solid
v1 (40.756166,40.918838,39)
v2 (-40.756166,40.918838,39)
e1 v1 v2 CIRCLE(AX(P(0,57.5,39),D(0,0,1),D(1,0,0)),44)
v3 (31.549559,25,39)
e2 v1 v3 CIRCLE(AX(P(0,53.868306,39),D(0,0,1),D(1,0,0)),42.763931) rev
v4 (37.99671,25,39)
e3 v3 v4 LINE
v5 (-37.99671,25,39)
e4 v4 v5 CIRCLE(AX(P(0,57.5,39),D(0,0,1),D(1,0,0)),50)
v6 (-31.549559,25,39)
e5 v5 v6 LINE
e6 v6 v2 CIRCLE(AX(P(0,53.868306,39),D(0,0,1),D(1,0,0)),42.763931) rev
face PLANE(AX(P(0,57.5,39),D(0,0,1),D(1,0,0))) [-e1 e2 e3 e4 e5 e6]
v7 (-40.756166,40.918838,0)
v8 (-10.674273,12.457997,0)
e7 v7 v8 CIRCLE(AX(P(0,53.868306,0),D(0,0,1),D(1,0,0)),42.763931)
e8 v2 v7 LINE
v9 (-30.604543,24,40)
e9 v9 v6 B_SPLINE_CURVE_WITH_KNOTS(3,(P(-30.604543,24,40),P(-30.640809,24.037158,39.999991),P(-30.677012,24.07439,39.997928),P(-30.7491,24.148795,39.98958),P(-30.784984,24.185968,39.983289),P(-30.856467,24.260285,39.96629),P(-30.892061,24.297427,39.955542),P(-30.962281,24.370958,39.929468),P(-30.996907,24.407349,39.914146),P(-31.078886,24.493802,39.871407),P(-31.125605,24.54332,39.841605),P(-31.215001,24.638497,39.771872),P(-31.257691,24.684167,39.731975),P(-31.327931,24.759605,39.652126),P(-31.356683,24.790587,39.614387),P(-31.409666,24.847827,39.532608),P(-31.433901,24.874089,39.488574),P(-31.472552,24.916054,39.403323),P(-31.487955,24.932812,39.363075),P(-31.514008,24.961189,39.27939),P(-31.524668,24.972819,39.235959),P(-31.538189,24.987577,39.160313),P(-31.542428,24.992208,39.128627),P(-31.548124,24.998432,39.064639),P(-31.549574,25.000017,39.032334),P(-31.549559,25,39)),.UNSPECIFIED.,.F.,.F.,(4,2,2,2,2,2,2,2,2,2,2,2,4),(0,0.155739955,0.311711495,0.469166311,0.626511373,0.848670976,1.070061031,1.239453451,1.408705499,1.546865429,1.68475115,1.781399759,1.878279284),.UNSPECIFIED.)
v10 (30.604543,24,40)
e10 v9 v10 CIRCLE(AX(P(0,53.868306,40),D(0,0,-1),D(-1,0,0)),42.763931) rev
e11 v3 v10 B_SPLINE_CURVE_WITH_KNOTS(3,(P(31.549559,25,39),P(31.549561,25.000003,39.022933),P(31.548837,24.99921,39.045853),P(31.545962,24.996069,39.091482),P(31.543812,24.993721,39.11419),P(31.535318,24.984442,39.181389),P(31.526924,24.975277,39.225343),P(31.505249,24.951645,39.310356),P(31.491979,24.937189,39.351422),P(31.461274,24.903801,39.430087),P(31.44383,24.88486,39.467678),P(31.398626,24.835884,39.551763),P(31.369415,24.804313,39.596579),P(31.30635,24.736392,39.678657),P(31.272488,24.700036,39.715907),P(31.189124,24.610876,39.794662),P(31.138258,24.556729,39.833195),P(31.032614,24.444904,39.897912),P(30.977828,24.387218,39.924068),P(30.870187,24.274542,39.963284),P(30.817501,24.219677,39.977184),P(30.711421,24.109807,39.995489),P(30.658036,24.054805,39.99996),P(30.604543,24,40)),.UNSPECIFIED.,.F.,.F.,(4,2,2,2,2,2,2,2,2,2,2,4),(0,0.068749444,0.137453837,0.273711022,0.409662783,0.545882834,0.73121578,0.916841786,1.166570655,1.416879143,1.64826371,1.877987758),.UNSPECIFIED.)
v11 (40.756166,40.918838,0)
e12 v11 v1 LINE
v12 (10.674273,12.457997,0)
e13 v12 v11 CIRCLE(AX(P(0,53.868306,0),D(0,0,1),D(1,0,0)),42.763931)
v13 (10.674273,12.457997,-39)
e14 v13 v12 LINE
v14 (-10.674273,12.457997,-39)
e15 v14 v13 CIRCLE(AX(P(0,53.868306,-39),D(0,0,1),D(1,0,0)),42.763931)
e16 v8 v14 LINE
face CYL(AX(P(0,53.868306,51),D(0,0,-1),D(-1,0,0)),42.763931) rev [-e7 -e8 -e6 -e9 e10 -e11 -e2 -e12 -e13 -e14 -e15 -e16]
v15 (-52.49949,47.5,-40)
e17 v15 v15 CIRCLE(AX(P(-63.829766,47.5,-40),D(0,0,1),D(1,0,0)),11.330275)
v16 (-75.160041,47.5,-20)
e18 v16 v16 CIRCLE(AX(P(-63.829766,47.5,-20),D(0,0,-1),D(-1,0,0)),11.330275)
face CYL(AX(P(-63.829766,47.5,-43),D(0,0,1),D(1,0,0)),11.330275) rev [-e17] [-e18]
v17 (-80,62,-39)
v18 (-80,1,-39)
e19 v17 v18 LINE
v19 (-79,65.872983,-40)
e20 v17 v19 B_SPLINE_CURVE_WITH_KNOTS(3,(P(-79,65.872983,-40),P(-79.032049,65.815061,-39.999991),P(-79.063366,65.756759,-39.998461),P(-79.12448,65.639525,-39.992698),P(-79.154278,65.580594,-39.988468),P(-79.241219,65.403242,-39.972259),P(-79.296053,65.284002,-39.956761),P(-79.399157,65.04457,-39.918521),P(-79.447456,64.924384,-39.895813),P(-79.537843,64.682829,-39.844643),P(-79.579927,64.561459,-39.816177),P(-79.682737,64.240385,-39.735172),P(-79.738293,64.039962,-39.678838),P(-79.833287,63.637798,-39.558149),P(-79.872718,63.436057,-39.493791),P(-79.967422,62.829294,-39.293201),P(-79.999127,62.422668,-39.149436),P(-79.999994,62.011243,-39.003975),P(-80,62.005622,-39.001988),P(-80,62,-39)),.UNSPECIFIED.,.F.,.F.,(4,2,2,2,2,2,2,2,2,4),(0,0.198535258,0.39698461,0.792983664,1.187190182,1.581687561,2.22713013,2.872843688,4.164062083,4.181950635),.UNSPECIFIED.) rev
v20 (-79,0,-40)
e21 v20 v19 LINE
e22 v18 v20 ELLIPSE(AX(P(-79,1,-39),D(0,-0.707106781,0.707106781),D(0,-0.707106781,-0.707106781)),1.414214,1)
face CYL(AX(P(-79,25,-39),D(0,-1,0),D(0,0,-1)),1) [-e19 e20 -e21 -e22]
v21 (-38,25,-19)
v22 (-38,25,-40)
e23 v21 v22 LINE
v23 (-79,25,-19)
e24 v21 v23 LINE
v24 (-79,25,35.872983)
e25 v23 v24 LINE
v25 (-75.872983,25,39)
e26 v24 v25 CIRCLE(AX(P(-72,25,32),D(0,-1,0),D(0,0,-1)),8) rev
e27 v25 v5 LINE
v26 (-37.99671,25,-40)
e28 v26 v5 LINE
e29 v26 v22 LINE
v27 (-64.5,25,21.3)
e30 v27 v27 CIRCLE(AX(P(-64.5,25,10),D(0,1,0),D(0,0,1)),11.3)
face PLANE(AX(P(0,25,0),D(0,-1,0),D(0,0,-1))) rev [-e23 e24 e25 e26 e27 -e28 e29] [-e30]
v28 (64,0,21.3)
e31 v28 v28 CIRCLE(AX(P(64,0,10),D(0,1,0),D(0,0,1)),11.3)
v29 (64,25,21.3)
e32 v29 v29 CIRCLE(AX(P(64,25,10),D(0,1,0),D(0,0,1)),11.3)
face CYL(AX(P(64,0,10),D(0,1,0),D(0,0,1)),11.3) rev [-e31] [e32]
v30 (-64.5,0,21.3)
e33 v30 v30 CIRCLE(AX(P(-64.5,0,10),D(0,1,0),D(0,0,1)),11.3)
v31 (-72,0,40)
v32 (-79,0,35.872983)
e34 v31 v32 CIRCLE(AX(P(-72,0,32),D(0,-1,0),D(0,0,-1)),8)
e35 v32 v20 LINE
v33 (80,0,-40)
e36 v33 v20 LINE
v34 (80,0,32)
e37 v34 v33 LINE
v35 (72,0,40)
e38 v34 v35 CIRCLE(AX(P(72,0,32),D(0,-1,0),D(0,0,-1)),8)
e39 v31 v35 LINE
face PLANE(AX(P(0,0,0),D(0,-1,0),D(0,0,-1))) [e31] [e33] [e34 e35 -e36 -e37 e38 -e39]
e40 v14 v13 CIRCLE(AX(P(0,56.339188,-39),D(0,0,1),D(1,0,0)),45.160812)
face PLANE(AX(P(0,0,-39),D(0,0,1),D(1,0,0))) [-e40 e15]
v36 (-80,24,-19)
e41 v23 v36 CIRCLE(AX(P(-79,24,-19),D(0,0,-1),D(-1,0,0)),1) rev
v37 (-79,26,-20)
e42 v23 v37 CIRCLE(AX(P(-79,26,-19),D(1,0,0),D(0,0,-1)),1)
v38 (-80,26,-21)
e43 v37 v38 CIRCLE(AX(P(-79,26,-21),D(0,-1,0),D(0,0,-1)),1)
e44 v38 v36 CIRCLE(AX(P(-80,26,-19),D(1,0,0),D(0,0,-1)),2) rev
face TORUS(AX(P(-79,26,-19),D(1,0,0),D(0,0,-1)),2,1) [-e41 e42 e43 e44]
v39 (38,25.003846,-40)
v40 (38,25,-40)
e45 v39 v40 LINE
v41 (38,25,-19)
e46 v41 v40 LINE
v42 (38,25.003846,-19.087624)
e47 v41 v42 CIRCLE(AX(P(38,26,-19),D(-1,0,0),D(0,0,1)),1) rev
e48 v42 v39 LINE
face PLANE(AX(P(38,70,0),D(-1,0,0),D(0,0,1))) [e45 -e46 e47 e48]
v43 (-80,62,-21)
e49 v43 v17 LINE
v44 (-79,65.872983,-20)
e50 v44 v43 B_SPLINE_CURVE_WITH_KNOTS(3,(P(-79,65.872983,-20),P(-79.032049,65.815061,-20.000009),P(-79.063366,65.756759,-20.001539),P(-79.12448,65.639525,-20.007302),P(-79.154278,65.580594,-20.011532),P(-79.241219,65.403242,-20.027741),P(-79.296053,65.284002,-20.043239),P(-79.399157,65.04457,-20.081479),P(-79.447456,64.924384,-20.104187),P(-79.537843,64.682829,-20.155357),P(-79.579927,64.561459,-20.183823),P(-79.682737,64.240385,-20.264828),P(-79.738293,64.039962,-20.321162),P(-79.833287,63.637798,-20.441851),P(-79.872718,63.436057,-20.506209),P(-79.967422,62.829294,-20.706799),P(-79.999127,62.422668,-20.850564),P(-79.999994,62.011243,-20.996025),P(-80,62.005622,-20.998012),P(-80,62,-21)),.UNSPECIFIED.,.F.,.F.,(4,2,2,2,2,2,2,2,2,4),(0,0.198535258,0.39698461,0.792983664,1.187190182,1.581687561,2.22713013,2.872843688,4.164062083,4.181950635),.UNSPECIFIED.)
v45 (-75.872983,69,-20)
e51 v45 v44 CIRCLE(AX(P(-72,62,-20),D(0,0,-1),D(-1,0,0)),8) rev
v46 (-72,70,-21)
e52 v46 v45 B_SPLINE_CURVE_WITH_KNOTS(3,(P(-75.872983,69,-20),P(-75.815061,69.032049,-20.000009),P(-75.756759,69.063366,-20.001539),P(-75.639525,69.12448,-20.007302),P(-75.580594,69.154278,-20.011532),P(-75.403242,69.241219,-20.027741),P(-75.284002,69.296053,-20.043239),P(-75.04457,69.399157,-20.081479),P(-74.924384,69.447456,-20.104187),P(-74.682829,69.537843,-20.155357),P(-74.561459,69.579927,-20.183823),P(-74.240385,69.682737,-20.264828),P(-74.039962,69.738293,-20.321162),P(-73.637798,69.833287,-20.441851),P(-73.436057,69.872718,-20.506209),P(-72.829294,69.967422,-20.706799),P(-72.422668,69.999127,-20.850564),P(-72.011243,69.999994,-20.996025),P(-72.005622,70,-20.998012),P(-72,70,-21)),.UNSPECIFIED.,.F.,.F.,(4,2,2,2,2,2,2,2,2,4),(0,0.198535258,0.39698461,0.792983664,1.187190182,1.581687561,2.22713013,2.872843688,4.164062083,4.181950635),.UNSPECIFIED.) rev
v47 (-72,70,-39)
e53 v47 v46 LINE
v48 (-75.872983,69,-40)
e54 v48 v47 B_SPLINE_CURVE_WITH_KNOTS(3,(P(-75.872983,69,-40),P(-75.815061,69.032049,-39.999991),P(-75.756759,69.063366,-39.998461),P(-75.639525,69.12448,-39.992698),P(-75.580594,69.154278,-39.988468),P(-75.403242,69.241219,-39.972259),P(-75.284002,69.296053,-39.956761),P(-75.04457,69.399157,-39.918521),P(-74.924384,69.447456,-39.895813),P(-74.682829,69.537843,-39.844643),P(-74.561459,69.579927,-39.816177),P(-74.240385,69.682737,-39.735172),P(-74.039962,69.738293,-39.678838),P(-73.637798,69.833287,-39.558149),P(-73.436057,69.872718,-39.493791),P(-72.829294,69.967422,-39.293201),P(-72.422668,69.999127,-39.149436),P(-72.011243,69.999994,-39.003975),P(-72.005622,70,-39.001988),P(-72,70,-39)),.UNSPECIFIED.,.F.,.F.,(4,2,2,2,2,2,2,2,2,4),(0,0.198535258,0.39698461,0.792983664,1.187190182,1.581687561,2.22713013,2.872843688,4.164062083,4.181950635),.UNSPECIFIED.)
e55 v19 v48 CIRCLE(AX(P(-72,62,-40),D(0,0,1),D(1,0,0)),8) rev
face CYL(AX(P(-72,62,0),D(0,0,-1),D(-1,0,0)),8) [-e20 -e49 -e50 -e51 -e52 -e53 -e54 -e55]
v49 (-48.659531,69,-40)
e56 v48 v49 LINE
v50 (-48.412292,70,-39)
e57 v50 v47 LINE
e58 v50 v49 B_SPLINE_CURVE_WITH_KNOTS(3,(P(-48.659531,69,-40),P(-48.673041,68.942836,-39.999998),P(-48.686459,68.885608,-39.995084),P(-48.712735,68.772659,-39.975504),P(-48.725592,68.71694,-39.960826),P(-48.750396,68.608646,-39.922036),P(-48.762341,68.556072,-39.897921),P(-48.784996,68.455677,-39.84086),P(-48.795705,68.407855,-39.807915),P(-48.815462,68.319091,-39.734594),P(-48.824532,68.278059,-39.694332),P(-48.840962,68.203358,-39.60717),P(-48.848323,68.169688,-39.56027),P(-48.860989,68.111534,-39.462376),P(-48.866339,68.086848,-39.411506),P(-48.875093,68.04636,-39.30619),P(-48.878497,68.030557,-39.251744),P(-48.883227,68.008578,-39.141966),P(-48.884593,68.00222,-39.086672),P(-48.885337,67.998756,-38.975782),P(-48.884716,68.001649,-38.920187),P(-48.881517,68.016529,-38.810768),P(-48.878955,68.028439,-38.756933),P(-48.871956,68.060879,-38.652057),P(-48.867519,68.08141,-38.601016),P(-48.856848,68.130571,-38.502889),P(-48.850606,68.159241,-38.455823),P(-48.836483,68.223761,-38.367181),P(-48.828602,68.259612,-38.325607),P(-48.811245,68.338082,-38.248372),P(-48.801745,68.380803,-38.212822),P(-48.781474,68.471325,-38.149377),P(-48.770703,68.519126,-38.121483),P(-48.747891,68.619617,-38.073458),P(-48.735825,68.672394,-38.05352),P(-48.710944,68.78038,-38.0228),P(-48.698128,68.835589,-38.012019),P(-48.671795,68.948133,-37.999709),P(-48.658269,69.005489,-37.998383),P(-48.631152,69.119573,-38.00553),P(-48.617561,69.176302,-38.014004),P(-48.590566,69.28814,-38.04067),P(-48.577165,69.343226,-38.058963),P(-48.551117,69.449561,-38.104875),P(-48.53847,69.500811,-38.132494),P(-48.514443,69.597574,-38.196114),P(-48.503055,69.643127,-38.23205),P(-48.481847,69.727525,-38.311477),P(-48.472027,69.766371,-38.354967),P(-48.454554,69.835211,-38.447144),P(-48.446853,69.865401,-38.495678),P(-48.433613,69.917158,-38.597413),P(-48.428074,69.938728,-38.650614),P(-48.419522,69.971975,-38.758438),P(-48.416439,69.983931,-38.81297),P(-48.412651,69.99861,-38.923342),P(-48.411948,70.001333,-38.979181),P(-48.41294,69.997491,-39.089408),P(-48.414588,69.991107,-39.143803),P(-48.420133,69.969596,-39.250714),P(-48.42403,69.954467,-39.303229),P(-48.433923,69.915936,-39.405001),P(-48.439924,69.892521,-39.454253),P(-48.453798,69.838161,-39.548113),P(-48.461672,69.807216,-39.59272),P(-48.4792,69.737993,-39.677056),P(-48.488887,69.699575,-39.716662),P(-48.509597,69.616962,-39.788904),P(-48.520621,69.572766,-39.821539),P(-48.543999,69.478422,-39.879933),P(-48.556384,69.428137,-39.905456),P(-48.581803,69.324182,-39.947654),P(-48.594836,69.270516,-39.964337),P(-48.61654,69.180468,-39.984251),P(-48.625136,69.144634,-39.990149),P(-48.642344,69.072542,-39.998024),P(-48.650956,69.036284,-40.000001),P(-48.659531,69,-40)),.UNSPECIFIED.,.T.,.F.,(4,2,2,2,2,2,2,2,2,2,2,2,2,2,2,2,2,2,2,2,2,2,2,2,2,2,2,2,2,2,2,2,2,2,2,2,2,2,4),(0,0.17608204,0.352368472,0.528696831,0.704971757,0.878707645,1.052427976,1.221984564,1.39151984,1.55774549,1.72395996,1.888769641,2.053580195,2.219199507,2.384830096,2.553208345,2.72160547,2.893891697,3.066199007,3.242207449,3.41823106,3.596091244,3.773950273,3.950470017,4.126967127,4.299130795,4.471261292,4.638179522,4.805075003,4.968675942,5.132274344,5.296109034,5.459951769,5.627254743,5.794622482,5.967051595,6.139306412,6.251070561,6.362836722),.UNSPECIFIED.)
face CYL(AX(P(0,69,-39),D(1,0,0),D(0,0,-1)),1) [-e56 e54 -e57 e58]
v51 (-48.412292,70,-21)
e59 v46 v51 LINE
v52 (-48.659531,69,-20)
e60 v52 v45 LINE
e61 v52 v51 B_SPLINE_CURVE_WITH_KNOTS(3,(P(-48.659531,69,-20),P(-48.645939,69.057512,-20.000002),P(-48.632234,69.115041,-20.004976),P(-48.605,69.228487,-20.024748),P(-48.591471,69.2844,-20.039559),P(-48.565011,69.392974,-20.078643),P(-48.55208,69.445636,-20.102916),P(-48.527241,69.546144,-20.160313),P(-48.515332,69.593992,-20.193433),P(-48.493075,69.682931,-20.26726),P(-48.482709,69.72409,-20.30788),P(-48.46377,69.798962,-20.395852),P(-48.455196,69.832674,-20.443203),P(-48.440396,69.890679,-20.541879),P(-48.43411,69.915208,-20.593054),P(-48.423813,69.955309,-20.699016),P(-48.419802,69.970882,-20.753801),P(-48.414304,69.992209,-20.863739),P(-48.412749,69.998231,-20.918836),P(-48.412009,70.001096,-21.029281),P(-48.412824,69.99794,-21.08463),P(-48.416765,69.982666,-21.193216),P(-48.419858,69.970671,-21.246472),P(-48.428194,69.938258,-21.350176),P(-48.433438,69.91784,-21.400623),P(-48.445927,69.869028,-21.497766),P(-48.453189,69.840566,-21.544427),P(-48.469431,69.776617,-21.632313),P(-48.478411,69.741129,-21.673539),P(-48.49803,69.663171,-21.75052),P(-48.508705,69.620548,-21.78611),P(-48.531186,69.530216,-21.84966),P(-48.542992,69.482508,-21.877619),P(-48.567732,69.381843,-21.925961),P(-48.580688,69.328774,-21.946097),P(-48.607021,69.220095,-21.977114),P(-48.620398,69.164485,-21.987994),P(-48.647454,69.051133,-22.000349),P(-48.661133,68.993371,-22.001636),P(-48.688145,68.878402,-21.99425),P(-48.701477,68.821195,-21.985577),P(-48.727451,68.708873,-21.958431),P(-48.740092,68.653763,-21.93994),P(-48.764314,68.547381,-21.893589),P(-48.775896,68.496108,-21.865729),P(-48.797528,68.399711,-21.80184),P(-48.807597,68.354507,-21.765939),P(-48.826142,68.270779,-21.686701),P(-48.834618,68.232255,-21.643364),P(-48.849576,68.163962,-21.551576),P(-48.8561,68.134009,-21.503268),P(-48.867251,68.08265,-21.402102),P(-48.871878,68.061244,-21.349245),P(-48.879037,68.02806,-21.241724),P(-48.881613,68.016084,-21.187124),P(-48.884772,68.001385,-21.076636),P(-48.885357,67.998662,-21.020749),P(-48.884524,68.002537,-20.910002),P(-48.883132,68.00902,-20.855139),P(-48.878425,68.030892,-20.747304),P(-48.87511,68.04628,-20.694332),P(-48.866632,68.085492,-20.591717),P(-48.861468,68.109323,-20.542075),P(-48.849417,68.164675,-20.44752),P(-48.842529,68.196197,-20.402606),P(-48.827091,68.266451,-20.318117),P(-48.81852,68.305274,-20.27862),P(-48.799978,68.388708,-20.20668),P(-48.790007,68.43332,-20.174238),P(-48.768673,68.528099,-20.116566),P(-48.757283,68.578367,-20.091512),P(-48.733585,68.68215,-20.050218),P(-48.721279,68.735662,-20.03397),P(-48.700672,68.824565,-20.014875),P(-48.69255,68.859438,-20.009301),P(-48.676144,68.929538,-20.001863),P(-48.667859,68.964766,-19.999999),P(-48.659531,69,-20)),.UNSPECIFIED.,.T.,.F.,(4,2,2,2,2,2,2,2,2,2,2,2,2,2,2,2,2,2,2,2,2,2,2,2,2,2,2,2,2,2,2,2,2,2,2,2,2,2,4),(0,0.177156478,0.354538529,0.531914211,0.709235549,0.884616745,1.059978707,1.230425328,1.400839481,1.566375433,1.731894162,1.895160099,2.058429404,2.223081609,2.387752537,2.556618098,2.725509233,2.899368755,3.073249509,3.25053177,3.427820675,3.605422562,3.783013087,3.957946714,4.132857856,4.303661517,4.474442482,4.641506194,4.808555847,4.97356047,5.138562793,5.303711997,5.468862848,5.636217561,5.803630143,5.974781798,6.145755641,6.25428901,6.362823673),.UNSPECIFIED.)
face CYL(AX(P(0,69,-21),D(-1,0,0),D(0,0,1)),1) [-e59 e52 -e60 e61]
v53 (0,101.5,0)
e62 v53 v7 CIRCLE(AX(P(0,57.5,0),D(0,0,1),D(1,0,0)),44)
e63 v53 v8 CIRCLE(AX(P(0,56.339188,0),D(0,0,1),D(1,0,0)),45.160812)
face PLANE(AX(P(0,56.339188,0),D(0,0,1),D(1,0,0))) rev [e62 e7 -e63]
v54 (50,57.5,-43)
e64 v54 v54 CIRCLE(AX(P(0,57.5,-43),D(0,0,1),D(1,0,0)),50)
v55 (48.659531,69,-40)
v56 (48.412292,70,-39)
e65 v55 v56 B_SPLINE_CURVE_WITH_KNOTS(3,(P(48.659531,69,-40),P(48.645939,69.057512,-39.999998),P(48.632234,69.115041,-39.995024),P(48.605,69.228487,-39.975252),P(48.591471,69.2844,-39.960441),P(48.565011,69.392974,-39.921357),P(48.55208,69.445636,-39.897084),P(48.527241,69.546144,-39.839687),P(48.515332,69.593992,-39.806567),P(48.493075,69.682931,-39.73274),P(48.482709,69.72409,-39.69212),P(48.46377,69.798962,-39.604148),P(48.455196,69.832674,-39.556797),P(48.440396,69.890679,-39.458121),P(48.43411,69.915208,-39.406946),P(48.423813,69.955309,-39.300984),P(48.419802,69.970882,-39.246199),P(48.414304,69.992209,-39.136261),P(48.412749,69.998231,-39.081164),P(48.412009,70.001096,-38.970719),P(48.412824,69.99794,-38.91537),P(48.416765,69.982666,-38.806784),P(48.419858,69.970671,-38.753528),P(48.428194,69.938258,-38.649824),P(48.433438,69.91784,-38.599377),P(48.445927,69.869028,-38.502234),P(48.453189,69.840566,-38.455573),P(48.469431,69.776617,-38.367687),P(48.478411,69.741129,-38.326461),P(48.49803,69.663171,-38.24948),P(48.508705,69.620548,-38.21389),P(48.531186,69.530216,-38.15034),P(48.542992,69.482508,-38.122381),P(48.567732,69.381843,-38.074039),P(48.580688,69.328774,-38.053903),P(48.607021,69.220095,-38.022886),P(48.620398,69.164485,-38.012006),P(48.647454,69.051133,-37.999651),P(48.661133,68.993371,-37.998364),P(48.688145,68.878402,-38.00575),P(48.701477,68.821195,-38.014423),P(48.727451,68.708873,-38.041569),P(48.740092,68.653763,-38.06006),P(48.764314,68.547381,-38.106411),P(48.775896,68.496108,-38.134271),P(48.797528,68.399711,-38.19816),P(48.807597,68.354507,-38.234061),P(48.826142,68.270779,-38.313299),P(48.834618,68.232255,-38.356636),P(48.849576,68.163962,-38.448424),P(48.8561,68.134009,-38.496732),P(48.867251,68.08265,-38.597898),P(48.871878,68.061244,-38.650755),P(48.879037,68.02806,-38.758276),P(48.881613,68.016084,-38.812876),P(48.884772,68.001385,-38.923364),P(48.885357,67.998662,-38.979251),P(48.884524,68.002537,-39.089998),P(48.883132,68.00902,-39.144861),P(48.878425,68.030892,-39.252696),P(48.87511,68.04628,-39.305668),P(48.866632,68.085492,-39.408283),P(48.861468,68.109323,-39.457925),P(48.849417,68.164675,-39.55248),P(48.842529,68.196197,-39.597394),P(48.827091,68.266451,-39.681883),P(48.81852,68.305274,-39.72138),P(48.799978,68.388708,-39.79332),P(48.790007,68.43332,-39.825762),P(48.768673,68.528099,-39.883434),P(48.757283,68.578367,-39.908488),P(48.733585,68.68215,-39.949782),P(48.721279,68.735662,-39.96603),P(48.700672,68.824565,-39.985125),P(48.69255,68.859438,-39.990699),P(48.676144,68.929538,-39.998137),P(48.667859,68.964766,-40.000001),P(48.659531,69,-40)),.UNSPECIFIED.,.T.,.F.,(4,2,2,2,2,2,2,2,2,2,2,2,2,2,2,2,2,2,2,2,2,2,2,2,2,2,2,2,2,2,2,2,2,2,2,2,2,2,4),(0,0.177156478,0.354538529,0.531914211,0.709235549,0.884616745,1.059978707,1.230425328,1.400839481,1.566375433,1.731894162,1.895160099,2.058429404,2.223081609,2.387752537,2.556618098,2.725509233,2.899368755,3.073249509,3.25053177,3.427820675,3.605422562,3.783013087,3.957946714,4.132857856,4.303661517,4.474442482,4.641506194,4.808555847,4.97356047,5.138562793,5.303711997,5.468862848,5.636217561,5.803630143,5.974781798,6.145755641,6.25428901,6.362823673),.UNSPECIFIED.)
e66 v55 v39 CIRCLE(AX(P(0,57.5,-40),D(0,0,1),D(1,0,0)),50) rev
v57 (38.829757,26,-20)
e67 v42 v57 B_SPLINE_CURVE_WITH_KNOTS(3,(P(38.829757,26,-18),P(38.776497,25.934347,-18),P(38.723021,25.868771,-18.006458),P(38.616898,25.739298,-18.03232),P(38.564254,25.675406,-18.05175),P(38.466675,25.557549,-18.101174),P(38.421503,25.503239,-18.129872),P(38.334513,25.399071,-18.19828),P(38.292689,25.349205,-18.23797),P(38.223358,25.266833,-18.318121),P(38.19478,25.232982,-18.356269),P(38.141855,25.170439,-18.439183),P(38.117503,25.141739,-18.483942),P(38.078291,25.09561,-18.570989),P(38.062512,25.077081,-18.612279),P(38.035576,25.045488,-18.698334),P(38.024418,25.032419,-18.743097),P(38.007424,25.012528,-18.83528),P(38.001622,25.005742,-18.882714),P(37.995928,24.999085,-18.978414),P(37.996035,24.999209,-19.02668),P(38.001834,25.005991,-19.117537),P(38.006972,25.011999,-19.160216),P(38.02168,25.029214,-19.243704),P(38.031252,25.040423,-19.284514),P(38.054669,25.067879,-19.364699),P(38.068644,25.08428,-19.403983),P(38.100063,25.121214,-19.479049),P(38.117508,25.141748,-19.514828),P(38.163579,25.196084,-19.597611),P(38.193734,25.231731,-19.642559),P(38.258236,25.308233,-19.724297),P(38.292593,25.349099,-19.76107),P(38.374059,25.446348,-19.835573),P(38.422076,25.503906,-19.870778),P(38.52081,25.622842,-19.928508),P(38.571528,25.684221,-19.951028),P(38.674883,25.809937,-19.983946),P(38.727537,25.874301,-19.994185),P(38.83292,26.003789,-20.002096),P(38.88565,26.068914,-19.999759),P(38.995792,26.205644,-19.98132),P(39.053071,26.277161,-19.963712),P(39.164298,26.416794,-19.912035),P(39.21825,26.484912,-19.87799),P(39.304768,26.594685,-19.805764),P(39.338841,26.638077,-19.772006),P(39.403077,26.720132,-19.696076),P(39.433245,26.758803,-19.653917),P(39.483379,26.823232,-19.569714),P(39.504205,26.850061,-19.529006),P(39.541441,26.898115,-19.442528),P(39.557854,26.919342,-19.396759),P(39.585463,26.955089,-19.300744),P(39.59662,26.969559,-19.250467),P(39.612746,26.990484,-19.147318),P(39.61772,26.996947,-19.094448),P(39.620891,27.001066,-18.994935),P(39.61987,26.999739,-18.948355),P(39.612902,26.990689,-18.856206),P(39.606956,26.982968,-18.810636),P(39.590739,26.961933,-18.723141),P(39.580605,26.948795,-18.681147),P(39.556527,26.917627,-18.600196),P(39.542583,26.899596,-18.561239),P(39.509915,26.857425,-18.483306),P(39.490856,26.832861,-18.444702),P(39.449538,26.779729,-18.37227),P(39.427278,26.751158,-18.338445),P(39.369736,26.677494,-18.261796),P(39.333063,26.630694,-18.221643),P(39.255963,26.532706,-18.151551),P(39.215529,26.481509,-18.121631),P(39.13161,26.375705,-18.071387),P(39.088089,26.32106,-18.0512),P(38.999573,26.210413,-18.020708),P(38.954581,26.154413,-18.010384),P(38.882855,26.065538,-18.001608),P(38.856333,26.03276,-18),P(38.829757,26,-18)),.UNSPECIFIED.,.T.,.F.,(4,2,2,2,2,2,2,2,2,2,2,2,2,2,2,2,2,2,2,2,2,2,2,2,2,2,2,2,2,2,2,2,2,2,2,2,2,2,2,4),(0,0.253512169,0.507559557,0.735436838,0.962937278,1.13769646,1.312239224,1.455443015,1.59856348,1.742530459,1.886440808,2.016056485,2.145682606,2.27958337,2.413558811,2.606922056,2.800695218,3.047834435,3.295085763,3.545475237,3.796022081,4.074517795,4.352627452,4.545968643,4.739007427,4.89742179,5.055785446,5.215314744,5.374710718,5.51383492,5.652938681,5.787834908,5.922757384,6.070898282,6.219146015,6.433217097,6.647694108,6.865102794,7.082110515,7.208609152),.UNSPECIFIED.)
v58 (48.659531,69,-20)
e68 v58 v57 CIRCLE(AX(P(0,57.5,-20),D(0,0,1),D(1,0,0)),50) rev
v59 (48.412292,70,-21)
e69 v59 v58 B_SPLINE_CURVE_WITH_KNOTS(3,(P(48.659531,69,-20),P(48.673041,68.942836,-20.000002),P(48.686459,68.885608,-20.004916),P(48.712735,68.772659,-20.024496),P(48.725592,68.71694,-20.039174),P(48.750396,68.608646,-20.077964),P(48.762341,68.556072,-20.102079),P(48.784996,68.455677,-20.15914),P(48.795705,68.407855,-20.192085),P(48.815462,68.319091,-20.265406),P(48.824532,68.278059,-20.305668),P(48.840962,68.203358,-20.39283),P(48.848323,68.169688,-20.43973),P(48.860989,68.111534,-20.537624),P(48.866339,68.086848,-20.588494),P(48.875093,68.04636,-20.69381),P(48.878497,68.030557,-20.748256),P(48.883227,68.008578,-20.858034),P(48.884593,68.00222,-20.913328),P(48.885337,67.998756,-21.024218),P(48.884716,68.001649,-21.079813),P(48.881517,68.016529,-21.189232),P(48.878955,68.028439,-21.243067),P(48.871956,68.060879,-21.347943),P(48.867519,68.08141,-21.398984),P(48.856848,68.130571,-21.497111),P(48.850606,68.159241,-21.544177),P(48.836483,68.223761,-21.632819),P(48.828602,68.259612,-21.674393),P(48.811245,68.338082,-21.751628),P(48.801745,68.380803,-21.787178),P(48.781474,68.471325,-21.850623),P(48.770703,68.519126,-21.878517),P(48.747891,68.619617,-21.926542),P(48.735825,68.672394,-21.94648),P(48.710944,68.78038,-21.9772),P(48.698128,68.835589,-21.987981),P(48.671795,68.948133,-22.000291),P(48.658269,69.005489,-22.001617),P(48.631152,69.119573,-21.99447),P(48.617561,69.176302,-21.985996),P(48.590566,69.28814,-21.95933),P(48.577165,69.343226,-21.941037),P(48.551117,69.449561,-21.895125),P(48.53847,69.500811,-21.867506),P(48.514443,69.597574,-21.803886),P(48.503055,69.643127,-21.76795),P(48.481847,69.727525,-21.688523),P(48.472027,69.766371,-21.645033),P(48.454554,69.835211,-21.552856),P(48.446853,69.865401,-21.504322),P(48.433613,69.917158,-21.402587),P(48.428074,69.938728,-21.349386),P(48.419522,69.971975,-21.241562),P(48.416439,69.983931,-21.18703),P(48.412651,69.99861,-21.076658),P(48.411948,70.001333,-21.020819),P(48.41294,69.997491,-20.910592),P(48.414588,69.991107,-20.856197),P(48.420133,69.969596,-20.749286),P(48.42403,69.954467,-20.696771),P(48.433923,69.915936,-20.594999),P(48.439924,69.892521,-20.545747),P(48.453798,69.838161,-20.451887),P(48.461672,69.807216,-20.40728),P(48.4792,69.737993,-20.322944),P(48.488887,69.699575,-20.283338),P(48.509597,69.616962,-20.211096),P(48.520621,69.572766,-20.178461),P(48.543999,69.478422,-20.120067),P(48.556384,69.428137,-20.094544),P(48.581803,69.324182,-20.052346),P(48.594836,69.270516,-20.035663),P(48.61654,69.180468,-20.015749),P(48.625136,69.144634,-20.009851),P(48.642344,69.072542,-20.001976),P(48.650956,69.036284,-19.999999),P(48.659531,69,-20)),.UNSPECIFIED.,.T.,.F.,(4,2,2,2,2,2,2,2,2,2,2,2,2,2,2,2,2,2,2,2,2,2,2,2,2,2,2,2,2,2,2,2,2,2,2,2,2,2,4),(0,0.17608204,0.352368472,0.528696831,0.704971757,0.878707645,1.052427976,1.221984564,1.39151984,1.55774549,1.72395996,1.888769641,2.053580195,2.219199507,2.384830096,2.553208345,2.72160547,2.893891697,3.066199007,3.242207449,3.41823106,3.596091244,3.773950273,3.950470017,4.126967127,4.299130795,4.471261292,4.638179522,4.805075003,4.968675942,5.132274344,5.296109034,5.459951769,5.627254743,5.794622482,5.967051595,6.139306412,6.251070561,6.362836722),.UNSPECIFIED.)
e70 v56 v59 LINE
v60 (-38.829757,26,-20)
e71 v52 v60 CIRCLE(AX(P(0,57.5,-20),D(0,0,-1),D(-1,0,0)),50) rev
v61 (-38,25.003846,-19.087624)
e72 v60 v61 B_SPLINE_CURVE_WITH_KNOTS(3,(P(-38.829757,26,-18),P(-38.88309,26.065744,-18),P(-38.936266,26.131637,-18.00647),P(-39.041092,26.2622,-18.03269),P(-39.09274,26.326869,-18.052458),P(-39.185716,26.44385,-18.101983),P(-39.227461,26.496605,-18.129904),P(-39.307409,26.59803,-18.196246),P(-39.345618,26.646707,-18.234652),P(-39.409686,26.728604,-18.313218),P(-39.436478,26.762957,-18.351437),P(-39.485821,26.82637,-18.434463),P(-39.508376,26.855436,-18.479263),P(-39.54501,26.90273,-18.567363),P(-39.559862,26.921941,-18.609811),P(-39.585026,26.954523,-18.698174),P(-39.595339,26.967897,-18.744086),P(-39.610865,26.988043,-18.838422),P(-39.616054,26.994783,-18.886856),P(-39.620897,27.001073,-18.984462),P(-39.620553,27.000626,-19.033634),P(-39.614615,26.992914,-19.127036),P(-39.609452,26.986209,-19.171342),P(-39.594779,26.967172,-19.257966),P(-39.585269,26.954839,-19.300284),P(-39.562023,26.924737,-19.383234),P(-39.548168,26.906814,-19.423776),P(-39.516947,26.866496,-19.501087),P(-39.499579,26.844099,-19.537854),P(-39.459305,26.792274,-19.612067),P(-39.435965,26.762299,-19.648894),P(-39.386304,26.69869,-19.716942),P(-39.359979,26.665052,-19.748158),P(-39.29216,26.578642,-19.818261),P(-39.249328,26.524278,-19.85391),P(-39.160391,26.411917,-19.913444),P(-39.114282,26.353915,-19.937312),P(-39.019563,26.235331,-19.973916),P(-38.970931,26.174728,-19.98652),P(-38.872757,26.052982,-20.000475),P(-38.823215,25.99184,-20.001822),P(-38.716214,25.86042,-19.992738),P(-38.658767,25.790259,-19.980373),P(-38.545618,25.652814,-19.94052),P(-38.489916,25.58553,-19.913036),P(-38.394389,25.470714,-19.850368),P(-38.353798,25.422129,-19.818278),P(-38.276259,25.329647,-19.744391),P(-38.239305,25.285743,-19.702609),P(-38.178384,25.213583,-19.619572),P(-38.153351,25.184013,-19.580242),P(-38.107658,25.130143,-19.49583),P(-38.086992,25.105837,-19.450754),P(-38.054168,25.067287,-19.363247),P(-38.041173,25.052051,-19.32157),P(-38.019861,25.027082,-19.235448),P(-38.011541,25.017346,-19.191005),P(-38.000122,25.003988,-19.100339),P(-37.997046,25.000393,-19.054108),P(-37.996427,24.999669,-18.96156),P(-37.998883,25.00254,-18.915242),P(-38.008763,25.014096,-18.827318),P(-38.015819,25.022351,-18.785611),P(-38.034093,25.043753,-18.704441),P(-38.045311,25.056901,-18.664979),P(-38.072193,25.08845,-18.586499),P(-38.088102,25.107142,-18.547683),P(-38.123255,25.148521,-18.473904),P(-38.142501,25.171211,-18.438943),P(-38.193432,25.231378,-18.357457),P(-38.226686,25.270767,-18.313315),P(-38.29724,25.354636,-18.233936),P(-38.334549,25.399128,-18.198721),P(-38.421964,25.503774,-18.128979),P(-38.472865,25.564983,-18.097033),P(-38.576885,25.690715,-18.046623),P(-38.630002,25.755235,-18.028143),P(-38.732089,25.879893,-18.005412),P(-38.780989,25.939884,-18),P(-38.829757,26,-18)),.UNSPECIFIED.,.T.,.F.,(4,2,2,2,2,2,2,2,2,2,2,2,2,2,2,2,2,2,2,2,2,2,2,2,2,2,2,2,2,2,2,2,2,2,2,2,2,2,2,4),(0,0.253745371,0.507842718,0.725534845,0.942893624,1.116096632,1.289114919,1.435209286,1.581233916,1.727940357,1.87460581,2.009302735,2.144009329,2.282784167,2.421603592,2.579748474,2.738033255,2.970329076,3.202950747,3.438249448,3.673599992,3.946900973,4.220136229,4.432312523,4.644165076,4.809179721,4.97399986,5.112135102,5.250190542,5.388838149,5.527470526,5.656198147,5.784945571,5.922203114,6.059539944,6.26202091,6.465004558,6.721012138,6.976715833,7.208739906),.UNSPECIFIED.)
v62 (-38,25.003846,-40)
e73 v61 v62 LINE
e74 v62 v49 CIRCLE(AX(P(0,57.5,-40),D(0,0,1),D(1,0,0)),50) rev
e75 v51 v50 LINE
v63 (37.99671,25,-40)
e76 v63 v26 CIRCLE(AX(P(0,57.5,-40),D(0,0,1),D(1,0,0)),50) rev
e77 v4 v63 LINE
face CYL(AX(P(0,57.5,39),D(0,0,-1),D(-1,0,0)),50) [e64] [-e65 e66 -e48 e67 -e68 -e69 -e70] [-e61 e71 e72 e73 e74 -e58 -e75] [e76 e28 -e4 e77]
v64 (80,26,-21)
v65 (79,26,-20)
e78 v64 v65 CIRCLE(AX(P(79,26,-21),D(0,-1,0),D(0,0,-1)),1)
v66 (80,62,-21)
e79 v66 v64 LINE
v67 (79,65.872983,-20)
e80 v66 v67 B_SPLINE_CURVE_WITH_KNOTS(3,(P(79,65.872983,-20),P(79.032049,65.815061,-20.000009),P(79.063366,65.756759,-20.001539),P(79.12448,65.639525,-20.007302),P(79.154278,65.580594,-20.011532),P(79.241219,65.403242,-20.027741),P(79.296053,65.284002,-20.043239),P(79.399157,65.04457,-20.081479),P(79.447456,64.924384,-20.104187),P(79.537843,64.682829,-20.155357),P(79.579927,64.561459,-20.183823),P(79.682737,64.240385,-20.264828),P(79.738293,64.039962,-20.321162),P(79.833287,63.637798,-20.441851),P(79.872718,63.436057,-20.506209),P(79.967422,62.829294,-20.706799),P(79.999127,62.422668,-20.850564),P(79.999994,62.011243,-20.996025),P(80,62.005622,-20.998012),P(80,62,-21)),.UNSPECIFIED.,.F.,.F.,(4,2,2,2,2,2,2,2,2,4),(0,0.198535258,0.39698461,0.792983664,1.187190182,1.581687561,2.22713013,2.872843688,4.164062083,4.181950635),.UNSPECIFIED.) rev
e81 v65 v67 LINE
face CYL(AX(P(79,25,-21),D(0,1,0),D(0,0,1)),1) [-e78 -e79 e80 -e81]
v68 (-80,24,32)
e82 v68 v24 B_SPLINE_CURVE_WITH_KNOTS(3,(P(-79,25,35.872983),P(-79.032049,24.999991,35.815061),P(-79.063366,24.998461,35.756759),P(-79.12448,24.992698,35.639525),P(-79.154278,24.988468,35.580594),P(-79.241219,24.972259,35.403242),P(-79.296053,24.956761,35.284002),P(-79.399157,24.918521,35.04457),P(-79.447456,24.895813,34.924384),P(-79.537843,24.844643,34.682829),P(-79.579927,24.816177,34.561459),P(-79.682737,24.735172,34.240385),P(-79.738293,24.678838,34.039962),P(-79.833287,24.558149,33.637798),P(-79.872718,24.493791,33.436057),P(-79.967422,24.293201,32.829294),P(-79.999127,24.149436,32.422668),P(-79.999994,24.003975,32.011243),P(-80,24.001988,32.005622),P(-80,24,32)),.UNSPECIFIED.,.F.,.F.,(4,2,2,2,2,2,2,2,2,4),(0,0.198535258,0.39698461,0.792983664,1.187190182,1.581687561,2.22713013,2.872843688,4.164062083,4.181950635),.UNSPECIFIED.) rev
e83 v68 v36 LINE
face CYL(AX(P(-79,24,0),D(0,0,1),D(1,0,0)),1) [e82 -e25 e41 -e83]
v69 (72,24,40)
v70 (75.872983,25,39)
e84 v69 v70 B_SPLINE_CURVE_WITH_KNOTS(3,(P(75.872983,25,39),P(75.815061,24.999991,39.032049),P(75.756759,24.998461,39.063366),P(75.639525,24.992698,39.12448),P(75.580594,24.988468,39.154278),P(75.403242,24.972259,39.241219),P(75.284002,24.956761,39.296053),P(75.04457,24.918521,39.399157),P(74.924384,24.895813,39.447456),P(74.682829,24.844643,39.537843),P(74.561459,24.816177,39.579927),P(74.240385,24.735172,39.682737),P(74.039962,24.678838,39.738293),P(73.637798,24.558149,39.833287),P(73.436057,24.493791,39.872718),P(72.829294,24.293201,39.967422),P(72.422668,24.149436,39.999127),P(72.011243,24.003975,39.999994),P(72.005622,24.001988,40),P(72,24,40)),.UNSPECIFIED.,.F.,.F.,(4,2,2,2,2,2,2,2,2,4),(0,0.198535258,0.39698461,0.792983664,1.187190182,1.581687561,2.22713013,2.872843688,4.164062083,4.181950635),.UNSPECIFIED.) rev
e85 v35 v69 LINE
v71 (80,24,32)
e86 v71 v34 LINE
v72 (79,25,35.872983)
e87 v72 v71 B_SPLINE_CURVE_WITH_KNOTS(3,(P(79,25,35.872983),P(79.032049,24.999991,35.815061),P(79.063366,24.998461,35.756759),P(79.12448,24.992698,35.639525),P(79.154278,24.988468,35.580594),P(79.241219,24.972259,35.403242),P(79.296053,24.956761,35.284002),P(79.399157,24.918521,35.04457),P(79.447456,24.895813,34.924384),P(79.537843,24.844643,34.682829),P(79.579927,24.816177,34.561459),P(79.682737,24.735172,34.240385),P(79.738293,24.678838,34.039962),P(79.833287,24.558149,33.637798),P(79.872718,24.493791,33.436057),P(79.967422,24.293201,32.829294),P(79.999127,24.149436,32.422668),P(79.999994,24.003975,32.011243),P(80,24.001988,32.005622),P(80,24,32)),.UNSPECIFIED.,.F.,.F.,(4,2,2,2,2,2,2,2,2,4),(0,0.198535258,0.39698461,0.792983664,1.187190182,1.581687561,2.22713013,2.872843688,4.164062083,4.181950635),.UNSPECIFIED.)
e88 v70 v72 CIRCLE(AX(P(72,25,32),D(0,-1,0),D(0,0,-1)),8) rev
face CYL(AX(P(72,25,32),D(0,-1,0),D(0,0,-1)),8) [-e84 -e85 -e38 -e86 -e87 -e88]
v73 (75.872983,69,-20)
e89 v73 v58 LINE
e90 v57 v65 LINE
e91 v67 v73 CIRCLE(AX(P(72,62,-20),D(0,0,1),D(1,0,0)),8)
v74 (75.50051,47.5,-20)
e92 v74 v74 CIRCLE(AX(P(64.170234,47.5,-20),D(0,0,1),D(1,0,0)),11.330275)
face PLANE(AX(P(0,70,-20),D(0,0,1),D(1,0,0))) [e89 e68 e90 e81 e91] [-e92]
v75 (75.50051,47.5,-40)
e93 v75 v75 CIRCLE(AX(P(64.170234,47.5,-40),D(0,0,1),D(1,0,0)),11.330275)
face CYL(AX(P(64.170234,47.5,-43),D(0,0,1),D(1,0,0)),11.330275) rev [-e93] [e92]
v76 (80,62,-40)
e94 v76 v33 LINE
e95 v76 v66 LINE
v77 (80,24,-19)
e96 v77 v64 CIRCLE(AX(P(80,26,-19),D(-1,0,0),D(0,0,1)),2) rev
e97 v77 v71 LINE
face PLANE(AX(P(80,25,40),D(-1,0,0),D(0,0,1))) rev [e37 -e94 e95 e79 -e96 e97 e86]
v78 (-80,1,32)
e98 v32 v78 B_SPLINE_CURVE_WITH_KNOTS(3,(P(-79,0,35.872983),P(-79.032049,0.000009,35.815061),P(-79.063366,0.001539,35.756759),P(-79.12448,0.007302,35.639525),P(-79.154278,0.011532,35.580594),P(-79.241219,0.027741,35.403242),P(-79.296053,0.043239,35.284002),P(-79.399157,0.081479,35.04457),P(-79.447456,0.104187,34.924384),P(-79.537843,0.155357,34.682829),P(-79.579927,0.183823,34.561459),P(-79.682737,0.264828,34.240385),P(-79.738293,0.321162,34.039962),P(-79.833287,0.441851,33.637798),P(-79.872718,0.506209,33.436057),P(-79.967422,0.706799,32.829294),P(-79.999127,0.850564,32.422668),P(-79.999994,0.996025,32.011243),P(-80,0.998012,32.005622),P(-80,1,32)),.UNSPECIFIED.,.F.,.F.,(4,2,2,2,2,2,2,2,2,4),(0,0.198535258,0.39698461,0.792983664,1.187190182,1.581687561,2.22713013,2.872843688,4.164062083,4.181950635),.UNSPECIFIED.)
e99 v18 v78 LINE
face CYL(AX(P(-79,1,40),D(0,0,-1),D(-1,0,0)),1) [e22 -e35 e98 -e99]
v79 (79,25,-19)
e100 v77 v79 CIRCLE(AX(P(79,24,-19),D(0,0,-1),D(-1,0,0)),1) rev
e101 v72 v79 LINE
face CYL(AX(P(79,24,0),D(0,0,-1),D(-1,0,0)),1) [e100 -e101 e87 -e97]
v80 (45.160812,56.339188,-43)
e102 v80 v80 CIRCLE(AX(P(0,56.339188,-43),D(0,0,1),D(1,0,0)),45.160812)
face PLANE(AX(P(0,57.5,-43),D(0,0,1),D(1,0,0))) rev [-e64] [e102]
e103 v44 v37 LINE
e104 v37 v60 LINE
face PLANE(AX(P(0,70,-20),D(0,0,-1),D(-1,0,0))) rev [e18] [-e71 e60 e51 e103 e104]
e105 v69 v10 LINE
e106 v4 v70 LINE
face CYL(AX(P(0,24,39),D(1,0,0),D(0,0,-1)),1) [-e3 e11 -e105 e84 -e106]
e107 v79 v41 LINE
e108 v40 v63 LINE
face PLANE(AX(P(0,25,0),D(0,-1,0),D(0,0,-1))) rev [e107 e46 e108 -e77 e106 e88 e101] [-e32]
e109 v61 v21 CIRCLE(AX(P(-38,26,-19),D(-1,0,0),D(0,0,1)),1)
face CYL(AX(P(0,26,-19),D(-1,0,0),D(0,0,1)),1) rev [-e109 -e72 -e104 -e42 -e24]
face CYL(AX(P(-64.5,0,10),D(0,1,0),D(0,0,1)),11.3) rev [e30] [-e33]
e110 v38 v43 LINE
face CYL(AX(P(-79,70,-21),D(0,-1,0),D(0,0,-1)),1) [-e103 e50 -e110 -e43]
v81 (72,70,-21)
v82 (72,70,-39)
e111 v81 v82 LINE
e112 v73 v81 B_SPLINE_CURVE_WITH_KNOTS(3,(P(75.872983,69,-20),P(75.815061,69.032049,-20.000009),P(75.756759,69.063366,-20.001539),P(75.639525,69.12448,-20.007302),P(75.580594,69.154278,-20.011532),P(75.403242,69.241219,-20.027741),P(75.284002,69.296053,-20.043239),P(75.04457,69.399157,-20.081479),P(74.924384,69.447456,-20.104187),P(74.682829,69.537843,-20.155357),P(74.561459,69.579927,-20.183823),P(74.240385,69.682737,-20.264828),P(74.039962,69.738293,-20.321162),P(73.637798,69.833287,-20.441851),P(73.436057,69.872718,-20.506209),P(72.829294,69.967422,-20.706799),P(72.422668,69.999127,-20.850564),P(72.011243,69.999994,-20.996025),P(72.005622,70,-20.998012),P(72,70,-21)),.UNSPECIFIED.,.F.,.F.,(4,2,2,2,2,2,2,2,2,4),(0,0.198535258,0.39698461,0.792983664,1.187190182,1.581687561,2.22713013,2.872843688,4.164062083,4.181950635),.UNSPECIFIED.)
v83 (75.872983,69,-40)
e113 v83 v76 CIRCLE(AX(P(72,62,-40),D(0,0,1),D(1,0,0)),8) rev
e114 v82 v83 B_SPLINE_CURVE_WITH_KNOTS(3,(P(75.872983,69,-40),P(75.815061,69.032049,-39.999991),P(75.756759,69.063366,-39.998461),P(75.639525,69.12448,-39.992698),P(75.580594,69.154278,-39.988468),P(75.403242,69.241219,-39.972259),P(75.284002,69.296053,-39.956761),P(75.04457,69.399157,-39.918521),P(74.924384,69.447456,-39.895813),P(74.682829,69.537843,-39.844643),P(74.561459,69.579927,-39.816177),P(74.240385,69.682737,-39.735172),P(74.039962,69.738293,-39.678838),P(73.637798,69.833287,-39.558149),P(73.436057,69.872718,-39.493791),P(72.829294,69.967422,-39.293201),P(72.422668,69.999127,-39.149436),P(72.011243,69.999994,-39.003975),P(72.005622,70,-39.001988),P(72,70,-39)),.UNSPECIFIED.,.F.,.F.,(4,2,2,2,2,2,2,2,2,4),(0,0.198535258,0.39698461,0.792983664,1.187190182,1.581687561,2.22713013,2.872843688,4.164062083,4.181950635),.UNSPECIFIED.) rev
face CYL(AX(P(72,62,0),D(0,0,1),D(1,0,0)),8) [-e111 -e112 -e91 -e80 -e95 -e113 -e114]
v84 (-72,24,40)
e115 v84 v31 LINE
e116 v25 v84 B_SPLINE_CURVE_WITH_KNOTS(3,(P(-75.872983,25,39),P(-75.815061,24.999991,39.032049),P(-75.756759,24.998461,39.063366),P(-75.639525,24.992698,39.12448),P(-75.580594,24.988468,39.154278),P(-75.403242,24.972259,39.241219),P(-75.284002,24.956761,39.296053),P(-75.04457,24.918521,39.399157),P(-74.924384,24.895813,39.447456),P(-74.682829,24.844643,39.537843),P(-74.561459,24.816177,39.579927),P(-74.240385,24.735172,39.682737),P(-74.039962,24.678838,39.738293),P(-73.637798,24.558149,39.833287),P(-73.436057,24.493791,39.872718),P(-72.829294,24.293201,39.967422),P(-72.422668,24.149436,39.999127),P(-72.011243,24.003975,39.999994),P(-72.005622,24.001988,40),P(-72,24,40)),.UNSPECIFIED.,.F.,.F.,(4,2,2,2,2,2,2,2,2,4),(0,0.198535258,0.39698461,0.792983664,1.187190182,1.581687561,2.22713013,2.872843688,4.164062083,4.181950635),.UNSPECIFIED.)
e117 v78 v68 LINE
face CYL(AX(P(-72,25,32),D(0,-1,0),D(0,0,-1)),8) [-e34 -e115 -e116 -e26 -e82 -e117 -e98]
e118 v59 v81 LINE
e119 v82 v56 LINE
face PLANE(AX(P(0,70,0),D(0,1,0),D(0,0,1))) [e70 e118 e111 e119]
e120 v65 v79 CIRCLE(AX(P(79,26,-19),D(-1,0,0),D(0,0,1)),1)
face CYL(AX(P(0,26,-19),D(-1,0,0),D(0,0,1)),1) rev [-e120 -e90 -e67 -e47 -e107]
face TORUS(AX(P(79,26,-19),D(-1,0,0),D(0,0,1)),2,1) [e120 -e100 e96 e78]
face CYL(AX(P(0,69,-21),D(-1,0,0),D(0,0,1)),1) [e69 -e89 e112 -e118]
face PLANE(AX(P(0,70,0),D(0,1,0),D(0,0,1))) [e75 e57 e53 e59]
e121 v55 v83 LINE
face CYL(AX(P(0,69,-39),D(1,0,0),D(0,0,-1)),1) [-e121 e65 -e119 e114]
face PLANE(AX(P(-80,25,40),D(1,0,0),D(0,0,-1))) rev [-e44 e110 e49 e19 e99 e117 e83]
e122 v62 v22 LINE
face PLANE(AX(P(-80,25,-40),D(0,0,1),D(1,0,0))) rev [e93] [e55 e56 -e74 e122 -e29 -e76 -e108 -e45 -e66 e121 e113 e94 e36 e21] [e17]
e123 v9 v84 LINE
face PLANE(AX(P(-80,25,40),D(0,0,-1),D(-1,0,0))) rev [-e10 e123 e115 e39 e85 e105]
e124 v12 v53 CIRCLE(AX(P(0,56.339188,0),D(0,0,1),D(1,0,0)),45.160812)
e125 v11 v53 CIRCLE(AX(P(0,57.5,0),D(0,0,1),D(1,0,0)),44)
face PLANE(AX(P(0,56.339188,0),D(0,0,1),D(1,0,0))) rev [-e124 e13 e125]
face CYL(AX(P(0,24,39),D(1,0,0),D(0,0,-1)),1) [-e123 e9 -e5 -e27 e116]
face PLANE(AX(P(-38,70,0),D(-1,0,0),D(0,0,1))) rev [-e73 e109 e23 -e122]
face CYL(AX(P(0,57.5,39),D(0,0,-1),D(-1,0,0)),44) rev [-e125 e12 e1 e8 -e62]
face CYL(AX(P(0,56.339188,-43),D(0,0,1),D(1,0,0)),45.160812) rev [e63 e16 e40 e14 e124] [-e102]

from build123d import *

# Parameters (mm, degrees)
SKETCH1_W                = 160
SKETCH1_H                = 80
BOSS_EXTRUDE1_DEPTH      = 25
SKETCH2_W                = 42
SKETCH2_H                = 20
BOSS_EXTRUDE2_DEPTH      = 45
FILLET1_R                = 1
EXTRUDE_THIN2_DEPTH      = 39
EXTRUDE_THIN2_DEPTH_BACK = 43
SKETCH6_R                = 50
SKETCH6_R_2              = 44
CUT_EXTRUDE2_DEPTH       = 51
CUT_EXTRUDE2_DEPTH_BACK  = 39
SKETCH7_R                = 42.763931037
SKETCH9_R                = 11.330275353
CUT_EXTRUDE4_DEPTH       = 141.731126785
SKETCH10_R               = 11.3
CUT_EXTRUDE5_DEPTH       = 123.699837168
FILLET4_R                = 8
SKETCH12_R               = 45.160812279
CUT_EXTRUDE10_DEPTH      = 141.731126785


with BuildPart() as part:
    # Sketch1 → Boss-Extrude1 (new body)
    with BuildSketch(Plane(origin=(0, 0, 0), x_dir=(1, 0, 0), z_dir=(0, 1, 0))):
        Rectangle(SKETCH1_W, SKETCH1_H)
    extrude(amount=BOSS_EXTRUDE1_DEPTH)

    # Sketch2 → Boss-Extrude2 (add)
    with BuildSketch(Plane(origin=(0, 25, 0), x_dir=(1, 0, 0), z_dir=(0, 1, 0))):
        with Locations((-59, 30)):
            Rectangle(SKETCH2_W, SKETCH2_H)
        with Locations((59, 30)):
            Rectangle(SKETCH2_W, SKETCH2_H)
    extrude(amount=BOSS_EXTRUDE2_DEPTH)

    # Fillet1
    fillet1_edges = [part.edges().sort_by_distance(p)[0] for p in [
        (-80, 25, 10),
        (-59, 25, -20),
        (-80, 47.5, -20),
        (0, 25, 40),
        (-59, 70, -20),
        (-59, 70, -40),
        (59, 70, -20),
        (80, 47.5, -20),
        (59, 70, -40),
        (59, 25, -20),
        (80, 25, 10),
        (-80, 0, 0),
        (-80, 35, -40),
    ]]
    fillet(fillet1_edges, radius=FILLET1_R)

    # Sketch6 → Extrude-Thin2 (add, two sides: drawn at the far end of the back side and taken through both)
    with BuildSketch(Plane.XY.offset(-EXTRUDE_THIN2_DEPTH_BACK)):
        with Locations((0, 57.5)):
            Circle(SKETCH6_R)
        with Locations((0, 57.5)):
            Circle(SKETCH6_R_2, mode=Mode.SUBTRACT)
    extrude(amount=EXTRUDE_THIN2_DEPTH + EXTRUDE_THIN2_DEPTH_BACK)

    # Sketch7 → Cut-Extrude2 (cut, two sides: drawn at the far end of the back side and taken through both)
    with BuildSketch(Plane.XY.offset(-CUT_EXTRUDE2_DEPTH_BACK)):
        with Locations((0, 53.868306457)):
            Circle(SKETCH7_R)
    extrude(amount=CUT_EXTRUDE2_DEPTH + CUT_EXTRUDE2_DEPTH_BACK, mode=Mode.SUBTRACT)

    # Sketch9 → Cut-Extrude4 (cut, through all)
    with BuildSketch(Plane.XY):
        with Locations((-63.82976572, 47.5)):
            Circle(SKETCH9_R)
        with Locations((64.17023428, 47.5)):
            Circle(SKETCH9_R)
    extrude(amount=-CUT_EXTRUDE4_DEPTH, mode=Mode.SUBTRACT)

    # Sketch10 → Cut-Extrude5 (cut, through all)
    with BuildSketch(Plane(origin=(0, 25, 0), x_dir=(1, 0, 0), z_dir=(0, 1, 0))):
        with Locations(Location((-64.5, -10, 0), (0, 0, 270))):
            Circle(SKETCH10_R)
        with Locations(Location((64, -10, 0), (0, 0, 270))):
            Circle(SKETCH10_R)
    extrude(amount=-CUT_EXTRUDE5_DEPTH, mode=Mode.SUBTRACT)

    # Fillet4
    # the kernel refuses this fillet: 8 mm, written as the material it takes off along each edge
    with BuildSketch(Plane(origin=(80, -20, 40), x_dir=(-1, 0, 0), z_dir=(0, 1, 0))) as fillet4_piece_1:
        with BuildLine():
            CenterArc((FILLET4_R, -FILLET4_R), FILLET4_R, 90, 90)
            Line((0, -FILLET4_R), (0, 0))
            Line((0, 0), (FILLET4_R, 0))
        make_face()
    extrude(amount=64, mode=Mode.SUBTRACT)
    with BuildSketch(Plane(origin=(-80, -19, 40), x_dir=(1, 0, 0), z_dir=(0, 1, 0))) as fillet4_piece_2:
        with BuildLine():
            CenterArc((FILLET4_R, FILLET4_R), FILLET4_R, 180, 90)
            Line((0, FILLET4_R), (0, 0))
            Line((0, 0), (FILLET4_R, 0))
        make_face()
    extrude(amount=63, mode=Mode.SUBTRACT)
    with BuildSketch(Plane(origin=(80, 70, -1), x_dir=(0, -1, 0), z_dir=(0, 0, -1)), Plane(origin=(-80, 70, -59), x_dir=(0, -1, 0), z_dir=(0, 0, 1))) as fillet4_piece_3:
        with BuildLine():
            CenterArc((FILLET4_R, FILLET4_R), FILLET4_R, 180, 90)
            Line((0, FILLET4_R), (0, 0))
            Line((0, 0), (FILLET4_R, 0))
        make_face()
    extrude(amount=58, mode=Mode.SUBTRACT)

    # Sketch12 → Cut-Extrude10 (cut, through all)
    with BuildSketch(Plane.XY):
        with Locations((0, 56.339187721)):
            Circle(SKETCH12_R)
    extrude(amount=-CUT_EXTRUDE10_DEPTH, mode=Mode.SUBTRACT)


solid = part.part
